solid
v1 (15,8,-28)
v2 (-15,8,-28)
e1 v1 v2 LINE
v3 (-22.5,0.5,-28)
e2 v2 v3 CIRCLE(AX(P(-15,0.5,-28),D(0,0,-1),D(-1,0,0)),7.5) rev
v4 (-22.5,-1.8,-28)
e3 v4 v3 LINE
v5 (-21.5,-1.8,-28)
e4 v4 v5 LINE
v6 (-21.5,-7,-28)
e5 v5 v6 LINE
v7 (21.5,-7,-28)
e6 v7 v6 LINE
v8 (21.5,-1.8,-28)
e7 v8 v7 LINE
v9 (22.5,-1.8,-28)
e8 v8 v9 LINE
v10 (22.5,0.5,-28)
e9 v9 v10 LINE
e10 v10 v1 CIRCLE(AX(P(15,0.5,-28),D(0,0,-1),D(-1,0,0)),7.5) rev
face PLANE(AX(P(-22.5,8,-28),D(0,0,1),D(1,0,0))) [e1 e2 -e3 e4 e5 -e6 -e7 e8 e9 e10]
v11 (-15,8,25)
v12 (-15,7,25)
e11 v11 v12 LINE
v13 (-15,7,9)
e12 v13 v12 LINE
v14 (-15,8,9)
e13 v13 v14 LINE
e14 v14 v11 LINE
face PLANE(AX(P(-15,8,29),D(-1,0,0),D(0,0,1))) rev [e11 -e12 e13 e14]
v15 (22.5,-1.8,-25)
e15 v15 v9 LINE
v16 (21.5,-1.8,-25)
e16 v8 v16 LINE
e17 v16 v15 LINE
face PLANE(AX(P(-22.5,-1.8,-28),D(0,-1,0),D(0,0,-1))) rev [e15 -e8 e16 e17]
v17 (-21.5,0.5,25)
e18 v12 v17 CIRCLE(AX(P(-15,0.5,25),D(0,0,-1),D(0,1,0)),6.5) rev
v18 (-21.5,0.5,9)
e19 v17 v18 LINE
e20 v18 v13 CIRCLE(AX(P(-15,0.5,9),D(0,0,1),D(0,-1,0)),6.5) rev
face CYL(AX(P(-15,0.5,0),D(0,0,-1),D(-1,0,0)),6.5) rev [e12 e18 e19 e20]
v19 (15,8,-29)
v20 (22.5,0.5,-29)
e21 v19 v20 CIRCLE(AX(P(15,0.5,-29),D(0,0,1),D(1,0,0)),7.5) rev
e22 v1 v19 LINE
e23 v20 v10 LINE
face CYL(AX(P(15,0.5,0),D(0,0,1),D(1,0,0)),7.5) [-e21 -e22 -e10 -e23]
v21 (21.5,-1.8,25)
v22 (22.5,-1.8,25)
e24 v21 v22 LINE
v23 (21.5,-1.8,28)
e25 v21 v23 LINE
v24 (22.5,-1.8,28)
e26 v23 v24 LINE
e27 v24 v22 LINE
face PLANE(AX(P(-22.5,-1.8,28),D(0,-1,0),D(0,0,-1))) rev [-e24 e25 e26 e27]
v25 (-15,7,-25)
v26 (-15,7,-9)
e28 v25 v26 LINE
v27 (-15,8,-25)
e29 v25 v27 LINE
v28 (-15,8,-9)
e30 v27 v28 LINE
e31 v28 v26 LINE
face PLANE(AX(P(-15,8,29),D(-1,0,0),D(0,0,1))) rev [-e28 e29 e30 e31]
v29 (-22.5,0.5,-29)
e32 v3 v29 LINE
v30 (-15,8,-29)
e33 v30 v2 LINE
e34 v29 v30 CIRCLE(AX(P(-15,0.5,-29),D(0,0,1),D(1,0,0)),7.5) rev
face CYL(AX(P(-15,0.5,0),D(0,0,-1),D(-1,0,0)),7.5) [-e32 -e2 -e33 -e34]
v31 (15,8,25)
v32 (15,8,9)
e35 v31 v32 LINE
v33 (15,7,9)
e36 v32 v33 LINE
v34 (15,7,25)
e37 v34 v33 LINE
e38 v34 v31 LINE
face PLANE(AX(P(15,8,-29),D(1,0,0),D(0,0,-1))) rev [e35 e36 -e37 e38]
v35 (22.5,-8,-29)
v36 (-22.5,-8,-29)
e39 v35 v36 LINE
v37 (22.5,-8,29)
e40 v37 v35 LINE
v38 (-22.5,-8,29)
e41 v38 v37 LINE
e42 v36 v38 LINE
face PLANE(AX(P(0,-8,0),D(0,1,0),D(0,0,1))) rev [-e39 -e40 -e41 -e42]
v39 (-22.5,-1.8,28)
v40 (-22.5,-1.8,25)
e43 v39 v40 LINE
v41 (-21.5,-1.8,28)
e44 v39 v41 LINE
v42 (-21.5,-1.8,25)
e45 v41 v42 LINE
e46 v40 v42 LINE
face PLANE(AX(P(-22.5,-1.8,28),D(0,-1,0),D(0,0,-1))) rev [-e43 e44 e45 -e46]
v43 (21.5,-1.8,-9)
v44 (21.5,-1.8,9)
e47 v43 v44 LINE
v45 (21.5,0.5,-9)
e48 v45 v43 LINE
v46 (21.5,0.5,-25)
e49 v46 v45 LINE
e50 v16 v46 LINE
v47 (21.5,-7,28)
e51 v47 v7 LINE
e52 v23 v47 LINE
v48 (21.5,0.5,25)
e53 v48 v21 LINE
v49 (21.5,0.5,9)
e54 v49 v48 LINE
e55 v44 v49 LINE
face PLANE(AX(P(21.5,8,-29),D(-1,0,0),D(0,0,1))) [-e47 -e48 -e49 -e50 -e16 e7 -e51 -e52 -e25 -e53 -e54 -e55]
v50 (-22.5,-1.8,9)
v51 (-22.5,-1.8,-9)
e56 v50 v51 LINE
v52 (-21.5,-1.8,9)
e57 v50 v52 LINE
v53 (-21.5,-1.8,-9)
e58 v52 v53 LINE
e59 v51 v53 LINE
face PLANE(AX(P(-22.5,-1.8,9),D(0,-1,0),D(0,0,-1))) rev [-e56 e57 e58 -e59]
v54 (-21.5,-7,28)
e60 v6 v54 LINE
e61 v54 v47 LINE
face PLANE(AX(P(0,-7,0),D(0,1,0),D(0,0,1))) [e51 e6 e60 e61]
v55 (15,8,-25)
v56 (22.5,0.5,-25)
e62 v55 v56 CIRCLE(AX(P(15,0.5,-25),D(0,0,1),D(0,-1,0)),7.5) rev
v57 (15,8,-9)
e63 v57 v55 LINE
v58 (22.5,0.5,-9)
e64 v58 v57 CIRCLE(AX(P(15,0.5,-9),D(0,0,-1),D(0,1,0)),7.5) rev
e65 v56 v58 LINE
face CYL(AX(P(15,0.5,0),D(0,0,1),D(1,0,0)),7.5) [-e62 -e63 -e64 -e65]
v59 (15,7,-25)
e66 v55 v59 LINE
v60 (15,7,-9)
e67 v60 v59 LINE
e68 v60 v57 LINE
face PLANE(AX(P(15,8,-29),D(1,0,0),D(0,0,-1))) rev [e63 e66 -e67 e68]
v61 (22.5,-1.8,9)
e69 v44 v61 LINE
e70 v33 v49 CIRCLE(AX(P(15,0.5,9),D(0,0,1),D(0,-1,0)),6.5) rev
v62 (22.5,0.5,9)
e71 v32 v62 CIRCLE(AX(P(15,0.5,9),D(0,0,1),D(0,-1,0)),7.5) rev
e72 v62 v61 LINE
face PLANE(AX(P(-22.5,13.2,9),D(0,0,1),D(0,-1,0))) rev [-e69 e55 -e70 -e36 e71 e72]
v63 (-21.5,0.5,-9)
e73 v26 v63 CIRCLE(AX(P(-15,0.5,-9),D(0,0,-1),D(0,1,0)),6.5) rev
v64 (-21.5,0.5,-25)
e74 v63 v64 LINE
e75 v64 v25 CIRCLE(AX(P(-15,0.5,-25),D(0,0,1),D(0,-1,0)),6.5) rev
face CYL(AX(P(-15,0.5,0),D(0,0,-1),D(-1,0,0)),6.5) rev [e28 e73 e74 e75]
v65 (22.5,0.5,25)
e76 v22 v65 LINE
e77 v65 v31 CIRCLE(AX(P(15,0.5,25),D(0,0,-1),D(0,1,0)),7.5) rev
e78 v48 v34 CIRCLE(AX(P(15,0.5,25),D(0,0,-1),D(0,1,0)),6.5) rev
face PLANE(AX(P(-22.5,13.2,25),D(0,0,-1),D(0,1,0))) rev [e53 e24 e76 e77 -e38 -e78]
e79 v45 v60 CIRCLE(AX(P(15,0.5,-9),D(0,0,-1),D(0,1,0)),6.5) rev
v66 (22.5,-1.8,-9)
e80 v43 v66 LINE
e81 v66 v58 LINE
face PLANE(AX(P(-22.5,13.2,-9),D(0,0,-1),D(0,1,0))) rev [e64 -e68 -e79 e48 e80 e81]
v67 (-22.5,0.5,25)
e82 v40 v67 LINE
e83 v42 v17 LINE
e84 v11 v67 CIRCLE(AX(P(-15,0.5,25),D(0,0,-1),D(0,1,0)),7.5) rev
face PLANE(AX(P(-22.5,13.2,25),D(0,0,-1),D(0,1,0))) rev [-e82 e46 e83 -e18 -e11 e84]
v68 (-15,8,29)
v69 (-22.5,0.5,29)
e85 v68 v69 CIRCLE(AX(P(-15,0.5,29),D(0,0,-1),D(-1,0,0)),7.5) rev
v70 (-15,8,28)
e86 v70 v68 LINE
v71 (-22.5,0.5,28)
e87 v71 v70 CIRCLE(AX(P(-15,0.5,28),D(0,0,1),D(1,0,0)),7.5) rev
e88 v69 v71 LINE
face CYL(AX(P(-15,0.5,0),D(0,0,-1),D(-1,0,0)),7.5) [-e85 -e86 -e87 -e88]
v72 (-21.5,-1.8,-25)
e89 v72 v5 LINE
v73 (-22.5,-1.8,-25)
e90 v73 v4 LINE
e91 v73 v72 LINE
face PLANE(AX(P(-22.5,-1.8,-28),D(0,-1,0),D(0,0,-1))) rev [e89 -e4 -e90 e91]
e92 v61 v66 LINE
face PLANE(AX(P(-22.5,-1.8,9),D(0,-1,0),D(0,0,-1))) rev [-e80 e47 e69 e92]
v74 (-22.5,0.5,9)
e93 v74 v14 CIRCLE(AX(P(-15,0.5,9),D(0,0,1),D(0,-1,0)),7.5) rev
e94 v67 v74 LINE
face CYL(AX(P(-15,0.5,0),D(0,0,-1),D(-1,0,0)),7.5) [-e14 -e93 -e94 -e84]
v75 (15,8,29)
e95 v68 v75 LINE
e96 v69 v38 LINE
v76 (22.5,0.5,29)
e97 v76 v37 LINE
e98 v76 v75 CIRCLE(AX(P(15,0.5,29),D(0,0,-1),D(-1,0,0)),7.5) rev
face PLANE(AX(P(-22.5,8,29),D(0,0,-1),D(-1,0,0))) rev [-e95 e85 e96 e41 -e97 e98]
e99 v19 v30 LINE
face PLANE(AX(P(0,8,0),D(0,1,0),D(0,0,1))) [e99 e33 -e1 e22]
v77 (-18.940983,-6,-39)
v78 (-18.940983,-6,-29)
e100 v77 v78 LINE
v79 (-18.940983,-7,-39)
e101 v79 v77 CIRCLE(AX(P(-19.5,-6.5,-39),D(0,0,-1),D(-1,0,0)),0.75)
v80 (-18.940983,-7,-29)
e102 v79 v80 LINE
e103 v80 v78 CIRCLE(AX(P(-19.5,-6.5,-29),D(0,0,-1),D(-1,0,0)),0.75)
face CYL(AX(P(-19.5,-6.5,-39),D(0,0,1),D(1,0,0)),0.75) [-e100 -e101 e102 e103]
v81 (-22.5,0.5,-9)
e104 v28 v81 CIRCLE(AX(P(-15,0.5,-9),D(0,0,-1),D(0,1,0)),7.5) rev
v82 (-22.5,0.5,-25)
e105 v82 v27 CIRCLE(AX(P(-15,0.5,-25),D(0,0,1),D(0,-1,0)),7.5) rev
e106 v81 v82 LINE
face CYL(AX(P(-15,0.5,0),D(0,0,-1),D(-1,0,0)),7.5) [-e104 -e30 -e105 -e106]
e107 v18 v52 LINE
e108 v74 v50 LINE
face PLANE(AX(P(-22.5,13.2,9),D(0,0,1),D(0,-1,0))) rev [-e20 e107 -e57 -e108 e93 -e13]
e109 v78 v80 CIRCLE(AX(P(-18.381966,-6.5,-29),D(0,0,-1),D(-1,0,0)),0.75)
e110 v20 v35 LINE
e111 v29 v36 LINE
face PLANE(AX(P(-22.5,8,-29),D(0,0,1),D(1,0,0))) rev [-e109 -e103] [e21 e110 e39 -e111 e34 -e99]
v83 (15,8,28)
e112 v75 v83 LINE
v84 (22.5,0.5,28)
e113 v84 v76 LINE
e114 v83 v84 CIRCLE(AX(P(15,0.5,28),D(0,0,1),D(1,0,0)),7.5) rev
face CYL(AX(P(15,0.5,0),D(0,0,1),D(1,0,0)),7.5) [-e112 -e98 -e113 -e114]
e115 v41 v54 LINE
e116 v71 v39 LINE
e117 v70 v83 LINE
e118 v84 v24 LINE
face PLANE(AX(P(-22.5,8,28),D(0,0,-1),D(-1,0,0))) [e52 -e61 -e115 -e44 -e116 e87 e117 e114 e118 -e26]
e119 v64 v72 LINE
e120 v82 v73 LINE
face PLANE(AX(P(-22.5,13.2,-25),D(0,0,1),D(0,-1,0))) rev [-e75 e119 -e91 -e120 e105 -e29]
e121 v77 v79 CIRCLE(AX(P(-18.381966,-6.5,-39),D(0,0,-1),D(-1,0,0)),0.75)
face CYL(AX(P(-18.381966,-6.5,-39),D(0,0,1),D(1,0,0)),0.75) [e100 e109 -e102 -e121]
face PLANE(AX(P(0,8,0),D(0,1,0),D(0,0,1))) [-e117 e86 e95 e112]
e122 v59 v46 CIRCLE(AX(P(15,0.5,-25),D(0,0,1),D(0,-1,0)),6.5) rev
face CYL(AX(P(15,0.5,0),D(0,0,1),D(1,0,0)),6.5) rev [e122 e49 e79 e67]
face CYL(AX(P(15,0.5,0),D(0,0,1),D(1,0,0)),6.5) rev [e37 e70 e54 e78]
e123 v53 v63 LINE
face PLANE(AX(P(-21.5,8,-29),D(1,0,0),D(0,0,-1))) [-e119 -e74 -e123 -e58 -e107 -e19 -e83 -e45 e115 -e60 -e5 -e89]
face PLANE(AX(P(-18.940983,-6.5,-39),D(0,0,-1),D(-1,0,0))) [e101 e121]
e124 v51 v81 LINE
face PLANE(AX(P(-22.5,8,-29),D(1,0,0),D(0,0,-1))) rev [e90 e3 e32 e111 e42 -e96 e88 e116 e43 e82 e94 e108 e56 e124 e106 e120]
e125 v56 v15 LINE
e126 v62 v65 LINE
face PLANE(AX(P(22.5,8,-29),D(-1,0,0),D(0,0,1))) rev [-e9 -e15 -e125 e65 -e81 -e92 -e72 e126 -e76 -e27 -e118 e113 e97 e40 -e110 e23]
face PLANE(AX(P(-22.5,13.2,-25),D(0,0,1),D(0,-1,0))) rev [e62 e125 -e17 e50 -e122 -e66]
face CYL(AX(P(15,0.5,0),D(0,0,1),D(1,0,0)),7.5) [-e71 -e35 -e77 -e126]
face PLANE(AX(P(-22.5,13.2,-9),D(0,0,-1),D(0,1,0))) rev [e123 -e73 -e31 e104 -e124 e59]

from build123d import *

# Parameters (mm, degrees)
SKETCH1_W           = 45
SKETCH1_H           = 58
BOSS_EXTRUDE1_DEPTH = 8
FILLET1_R           = 7.5
SHELL1_START        = -28
SHELL1_DEPTH        = 56
SKETCH2_W           = 18
SKETCH2_H           = 15
SKETCH2_W_2         = 3
CUT_EXTRUDE1_DEPTH  = 55.129474411
BOSS_EXTRUDE2_DEPTH = 10


# Read off the part's stored shape, not the designer's step: Shell1
with BuildPart() as part:
    # Sketch1 → Boss-Extrude1 (new, symmetric)
    with BuildSketch(Plane(origin=(0, 0, 0), x_dir=(1, 0, 0), z_dir=(0, 1, 0))):
        Rectangle(SKETCH1_W, SKETCH1_H)
    extrude(amount=BOSS_EXTRUDE1_DEPTH, both=True)

    # Fillet1
    fillet1_edges = [part.edges().sort_by_distance(p)[0] for p in [
        (22.5, 8, 0),
        (-22.5, 8, 0),
    ]]
    fillet(fillet1_edges, radius=FILLET1_R)

    # Shell1 outline → Shell1 (cut)
    with BuildSketch(Plane.XY.offset(SHELL1_START)):
        with BuildLine():
            ThreePointArc((21.5, 0.5), (19.596194078, 5.096194078), (15, 7))
            Line((15, 7), (15, 8))
            Line((15, 8), (-15, 8))
            Line((-15, 8), (-15, 7))
            ThreePointArc((-15, 7), (-19.596194078, 5.096194078), (-21.5, 0.5))
            Line((-21.5, 0.5), (-21.5, -7))
            Line((-21.5, -7), (21.5, -7))
            Line((21.5, -7), (21.5, 0.5))
        make_face()
    extrude(amount=SHELL1_DEPTH, mode=Mode.SUBTRACT)

    # Sketch2 → Cut-Extrude1 (cut, through all)
    with BuildSketch(Plane(origin=(22.5, 0, 0), x_dir=(0, 0, -1), z_dir=(1, 0, 0))):
        with Locations((0, 5.7)):
            Rectangle(SKETCH2_W, SKETCH2_H)
        with Locations((-26.5, 5.7)):
            Rectangle(SKETCH2_W_2, SKETCH2_H)
        with Locations((26.5, 5.7)):
            Rectangle(SKETCH2_W_2, SKETCH2_H)
    extrude(amount=-CUT_EXTRUDE1_DEPTH, mode=Mode.SUBTRACT)

    # Sketch3 → Boss-Extrude2 (add)
    with BuildSketch(Plane(origin=(0, 0, -29), x_dir=(-1, 0, 0), z_dir=(0, 0, -1))):
        with BuildLine():
            ThreePointArc((18.940983006, -7), (20.25, -6.5), (18.940983006, -6))
            ThreePointArc((18.940983006, -6), (17.631966011, -6.5), (18.940983006, -7))
        make_face()
    extrude(amount=BOSS_EXTRUDE2_DEPTH)


solid = part.part
